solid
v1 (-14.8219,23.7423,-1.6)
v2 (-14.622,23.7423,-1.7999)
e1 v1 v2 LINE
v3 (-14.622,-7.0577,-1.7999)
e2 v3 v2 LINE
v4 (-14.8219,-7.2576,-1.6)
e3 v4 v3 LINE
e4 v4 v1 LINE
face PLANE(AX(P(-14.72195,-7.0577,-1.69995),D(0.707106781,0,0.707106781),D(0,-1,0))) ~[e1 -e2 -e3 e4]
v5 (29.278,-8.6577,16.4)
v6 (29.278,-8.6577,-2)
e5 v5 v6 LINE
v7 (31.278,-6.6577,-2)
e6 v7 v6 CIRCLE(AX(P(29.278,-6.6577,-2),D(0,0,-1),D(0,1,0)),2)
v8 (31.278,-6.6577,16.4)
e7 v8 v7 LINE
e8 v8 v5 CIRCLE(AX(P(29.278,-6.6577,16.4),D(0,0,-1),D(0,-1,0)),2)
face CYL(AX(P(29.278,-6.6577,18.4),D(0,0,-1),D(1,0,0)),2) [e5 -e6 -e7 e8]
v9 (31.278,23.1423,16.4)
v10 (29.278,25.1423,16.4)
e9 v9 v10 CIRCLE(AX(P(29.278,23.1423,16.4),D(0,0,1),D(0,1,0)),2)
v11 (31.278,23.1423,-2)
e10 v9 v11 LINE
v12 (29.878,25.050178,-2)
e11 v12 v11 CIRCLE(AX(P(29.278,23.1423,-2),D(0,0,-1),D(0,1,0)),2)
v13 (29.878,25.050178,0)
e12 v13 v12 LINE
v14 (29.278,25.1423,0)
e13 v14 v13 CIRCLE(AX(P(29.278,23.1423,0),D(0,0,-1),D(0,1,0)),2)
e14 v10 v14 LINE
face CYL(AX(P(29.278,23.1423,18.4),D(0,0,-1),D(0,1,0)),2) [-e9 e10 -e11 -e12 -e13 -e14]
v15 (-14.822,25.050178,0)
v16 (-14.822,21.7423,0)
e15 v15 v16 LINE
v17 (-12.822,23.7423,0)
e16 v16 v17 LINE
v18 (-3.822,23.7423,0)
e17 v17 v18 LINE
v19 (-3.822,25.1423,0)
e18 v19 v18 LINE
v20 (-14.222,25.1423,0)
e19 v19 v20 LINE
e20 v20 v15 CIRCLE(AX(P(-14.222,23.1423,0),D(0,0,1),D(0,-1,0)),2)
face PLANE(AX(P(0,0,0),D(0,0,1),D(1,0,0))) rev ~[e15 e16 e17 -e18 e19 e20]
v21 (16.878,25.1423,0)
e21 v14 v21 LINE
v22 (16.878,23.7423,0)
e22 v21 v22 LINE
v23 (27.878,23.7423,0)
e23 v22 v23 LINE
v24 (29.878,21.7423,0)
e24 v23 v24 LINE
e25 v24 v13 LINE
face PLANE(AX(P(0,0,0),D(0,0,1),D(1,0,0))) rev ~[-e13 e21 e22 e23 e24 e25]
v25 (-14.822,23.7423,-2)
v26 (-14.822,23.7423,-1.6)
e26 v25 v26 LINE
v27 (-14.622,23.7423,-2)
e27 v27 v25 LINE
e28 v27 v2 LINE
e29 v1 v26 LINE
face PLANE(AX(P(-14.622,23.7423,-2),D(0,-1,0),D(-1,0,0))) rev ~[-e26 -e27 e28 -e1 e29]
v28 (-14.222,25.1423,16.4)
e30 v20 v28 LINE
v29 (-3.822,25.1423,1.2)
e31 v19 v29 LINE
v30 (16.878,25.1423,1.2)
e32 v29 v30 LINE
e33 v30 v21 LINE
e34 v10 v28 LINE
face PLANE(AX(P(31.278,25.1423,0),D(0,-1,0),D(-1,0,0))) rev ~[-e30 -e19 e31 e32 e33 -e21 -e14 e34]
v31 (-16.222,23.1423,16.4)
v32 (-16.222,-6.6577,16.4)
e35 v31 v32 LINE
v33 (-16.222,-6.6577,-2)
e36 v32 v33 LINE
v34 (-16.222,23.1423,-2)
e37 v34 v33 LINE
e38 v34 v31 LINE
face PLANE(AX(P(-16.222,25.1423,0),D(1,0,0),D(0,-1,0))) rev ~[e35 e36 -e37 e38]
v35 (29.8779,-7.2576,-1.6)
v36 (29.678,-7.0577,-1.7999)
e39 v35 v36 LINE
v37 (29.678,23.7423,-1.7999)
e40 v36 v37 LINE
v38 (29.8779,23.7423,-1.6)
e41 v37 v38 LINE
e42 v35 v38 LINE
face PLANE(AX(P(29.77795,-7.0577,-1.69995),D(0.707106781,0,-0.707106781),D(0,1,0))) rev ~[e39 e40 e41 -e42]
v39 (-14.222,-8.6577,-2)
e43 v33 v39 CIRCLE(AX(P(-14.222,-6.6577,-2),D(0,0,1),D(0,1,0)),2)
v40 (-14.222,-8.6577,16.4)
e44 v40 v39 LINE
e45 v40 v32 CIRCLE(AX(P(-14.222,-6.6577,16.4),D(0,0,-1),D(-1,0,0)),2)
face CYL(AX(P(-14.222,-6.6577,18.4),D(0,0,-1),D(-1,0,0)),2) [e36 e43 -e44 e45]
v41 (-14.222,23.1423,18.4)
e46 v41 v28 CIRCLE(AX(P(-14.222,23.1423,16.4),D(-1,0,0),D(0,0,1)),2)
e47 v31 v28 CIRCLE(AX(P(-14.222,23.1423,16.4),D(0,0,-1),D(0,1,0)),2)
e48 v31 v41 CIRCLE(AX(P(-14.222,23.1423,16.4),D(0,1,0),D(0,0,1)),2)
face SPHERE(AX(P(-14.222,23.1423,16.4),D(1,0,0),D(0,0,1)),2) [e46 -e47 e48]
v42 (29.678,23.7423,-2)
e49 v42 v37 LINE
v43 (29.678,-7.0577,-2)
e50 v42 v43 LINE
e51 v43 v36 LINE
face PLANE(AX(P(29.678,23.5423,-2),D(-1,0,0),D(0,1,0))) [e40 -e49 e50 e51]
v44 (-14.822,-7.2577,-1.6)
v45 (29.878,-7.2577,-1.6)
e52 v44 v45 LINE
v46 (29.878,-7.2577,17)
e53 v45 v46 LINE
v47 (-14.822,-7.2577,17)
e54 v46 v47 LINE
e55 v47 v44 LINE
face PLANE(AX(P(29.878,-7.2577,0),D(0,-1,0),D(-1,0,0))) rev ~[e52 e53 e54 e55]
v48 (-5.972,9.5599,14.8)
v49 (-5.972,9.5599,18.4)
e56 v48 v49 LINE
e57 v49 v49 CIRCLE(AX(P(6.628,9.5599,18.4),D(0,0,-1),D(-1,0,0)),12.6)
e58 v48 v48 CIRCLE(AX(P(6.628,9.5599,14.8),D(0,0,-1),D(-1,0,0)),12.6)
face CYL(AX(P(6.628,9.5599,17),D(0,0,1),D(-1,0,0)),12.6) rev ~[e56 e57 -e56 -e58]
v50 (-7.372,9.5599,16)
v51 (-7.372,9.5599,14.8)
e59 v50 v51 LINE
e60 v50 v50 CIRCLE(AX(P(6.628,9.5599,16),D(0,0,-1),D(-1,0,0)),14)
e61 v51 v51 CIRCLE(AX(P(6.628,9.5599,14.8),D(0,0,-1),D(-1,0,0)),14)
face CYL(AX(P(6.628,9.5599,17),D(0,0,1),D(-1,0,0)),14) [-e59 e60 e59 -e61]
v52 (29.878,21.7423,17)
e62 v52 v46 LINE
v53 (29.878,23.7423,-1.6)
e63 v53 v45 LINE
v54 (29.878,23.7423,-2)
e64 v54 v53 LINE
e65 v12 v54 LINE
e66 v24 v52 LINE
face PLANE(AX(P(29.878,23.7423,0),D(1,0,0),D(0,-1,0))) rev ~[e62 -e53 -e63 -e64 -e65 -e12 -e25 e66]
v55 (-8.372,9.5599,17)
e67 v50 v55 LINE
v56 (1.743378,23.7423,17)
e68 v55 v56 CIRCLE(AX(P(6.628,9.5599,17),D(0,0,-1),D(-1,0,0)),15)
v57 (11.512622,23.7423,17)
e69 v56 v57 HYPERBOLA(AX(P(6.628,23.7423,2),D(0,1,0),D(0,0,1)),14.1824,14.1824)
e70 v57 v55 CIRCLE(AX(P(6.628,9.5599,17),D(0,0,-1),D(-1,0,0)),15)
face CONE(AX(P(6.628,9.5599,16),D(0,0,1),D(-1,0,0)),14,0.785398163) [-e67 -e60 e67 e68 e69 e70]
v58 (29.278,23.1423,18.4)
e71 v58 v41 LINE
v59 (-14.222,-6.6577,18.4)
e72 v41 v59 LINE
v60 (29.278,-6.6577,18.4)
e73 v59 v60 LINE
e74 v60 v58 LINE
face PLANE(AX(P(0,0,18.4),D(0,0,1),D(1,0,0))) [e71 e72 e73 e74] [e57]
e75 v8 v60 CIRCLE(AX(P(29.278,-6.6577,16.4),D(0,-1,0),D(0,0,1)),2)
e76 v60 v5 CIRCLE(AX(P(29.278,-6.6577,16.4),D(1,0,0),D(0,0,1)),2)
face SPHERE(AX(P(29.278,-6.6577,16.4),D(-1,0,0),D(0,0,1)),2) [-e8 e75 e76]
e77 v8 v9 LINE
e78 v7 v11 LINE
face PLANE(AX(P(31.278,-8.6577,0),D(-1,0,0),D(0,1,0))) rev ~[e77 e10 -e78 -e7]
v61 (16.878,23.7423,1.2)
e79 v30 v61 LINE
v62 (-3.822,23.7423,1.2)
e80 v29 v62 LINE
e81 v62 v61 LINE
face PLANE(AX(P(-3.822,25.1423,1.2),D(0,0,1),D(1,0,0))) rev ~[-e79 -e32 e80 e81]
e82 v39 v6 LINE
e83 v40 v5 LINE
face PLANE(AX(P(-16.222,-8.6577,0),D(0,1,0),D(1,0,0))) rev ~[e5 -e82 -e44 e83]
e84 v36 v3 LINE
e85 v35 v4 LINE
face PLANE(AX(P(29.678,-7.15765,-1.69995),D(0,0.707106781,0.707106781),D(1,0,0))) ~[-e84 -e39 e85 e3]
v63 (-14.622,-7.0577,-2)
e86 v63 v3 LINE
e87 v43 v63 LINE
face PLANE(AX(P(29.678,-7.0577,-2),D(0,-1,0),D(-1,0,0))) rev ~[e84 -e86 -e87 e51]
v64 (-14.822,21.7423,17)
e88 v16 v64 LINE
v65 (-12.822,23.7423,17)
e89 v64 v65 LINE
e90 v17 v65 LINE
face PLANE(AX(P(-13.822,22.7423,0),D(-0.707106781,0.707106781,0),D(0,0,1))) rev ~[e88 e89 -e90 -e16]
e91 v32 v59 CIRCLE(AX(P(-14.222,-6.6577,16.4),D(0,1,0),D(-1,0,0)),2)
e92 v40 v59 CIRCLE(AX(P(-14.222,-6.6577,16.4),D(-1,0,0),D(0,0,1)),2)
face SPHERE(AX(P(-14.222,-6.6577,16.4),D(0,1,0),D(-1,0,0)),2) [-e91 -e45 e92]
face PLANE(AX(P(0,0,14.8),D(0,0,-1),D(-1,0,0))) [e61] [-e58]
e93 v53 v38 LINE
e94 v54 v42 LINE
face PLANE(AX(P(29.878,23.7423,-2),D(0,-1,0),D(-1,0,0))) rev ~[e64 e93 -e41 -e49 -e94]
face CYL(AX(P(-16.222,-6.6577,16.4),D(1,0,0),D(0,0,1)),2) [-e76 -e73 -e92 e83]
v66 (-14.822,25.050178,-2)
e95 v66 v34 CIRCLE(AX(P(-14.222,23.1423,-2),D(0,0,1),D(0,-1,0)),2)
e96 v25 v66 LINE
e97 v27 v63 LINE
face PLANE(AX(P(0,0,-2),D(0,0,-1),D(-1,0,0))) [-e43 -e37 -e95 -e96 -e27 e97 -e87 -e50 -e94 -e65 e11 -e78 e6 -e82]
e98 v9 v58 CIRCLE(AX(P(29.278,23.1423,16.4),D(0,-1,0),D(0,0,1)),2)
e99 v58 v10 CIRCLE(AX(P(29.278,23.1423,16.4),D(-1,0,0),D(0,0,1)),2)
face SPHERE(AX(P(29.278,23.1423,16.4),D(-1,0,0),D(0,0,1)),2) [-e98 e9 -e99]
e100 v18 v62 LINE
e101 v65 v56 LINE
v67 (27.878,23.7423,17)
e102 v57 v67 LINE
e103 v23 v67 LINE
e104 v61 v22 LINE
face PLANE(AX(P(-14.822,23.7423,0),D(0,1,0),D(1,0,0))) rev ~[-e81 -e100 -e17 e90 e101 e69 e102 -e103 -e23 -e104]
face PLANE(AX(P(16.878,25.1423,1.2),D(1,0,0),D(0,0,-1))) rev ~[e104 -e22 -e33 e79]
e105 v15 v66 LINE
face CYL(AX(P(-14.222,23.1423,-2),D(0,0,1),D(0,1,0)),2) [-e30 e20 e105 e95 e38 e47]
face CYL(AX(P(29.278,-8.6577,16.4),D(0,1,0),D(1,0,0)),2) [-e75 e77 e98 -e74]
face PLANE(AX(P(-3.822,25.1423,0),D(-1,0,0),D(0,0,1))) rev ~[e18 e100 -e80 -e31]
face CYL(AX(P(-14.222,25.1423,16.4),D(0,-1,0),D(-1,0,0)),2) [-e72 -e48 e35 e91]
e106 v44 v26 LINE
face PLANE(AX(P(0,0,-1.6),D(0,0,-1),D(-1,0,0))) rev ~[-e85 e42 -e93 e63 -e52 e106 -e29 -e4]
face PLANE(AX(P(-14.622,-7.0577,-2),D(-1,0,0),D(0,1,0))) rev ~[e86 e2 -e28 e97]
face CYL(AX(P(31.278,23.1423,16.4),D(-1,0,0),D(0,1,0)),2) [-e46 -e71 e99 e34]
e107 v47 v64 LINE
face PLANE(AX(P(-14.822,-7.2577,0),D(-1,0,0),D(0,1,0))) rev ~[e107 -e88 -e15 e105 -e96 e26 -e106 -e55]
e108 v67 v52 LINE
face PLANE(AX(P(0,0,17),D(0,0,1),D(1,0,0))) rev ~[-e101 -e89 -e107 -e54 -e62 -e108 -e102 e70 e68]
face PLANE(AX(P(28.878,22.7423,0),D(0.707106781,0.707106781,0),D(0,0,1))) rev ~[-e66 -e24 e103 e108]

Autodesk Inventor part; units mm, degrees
ref_plane "YZ Plane" through (0, 0, 0) normal (1, 0, 0) x (0, 1, 0)
ref_plane "XZ Plane" through (0, 0, 0) normal (0, 1, 0) x (-1, 0, 0)
ref_plane "XY Plane" through (0, 0, 0) normal (0, 0, 1) x (1, 0, 0)
sketch "Sketch1" plane through (0, 0, 0) normal (0, 0, 1) x (1, 0, 0)
  line L0 (-14.822, 23.7423) -> (29.878, 23.7423)
  line L1 (29.878, 23.7423) -> (29.878, -7.2577)
  line L2 (29.878, -7.2577) -> (-14.822, -7.2577)
  line L3 (-14.822, -7.2577) -> (-14.822, 23.7423)
  line L4 (31.278, 25.1423) -> (-16.222, 25.1423)
  line L5 (-16.222, 25.1423) -> (-16.222, -8.6577)
  line L6 (-16.222, -8.6577) -> (31.278, -8.6577)
  line L7 (31.278, -8.6577) -> (31.278, 25.1423)
  point P0 (0, 0)
  dimension "d0" = 44.7
  dimension "d1" = 31
  dimension "d2" = 1.4
extrude "Extrusion1" add sketch "Sketch1" along normal blind 17
sketch "Sketch2" plane through (0, 0, 17) normal (0, 0, 1) x (1, 0, 0)
  line L0 (31.278, 25.1423) -> (-16.222, 25.1423) projected
  line L1 (-16.222, 25.1423) -> (-16.222, -8.6577) projected
  line L2 (-16.222, -8.6577) -> (31.278, -8.6577) projected
  line L3 (31.278, -8.6577) -> (31.278, 25.1423) projected
  point P0 (0, 0)
extrude "Extrusion2" add sketch "Sketch2" along normal blind 1.4
sketch "Sketch4" plane through (0, 0, 17) normal (0, 0, -1) x (-1, 0, 0)
  circle A0 centre (-6.628, 9.5599) radius 12.6
  line L0 (-29.878, -7.2577) -> (-29.878, 23.7423) projected
  line L1 (14.822, 23.7423) -> (14.822, -7.2577) projected
  point P0 (0, 0)
  dimension "d7" = 23.25
  dimension "d8" = 44.7
  dimension "d9" = 25.2
extrude "Extrusion3" cut sketch "Sketch4" against normal blind 1.4
sketch "Sketch5" plane through (0, 0, 17) normal (0, 0, -1) x (-1, 0, 0)
  circle A0 centre (-6.628, 9.5599) radius 12.6 projected
  circle A1 centre (-6.628, 9.5599) radius 14
  point P0 (0, 0)
  dimension "d12" = 1.4
extrude "Extrusion4" add sketch "Sketch5" along normal blind 2.2
chamfer "Chamfer1" distance 1 angle 45 1 edges at (20.628, 9.5599, 17)
sketch "Sketch6" plane through (0, 0, 0) normal (0, 0, -1) x (-1, 0, 0)
  line L0 (16.222, 25.1423) -> (16.222, -8.6577) projected
  line L1 (16.222, -8.6577) -> (-31.278, -8.6577) projected
  line L2 (-31.278, -8.6577) -> (-31.278, 25.1423) projected
  line L3 (14.822, 23.7423) -> (14.822, -7.2577) projected
  line L4 (14.822, -7.2577) -> (-29.878, -7.2577) projected
  line L5 (-29.878, -7.2577) -> (-29.878, 23.7423) projected
  line L6 (14.822, 23.7423) -> (-1.7434, 23.7423) projected
  line L7 (14.822, 23.7423) -> (14.822, 25.1423)
  line L8 (14.822, 25.1423) -> (16.222, 25.1423)
  line L9 (-29.878, 23.7423) -> (-29.878, 25.1423)
  line L10 (-29.878, 25.1423) -> (-31.278, 25.1423)
  point P0 (0, 0)
extrude "Extrusion5" add sketch "Sketch6" along normal blind 2
sketch "Sketch8" plane through (0, 0, -2) normal (0, 0, -1) x (-1, 0, 0)
  line L0 (14.822, -7.2577) -> (14.822, 23.7423) projected
  line L1 (-29.878, 23.7423) -> (-29.878, -7.2577) projected
  line L2 (14.822, -7.2577) -> (-29.878, -7.2577)
  line L3 (-29.878, -7.2577) -> (-29.878, 23.7423)
  line L4 (14.822, 23.7423) -> (14.822, -7.2577)
  line L5 (-29.678, -7.0577) -> (14.622, -7.0577)
  line L6 (14.622, -7.0577) -> (14.622, 23.5423)
  line L7 (-29.678, 23.5423) -> (-29.678, -7.0577)
  line L8 (14.622, 23.5423) -> (14.622, 23.7423)
  line L9 (-29.678, 23.5423) -> (-29.678, 23.7423)
  line L10 (-29.878, 23.7423) -> (14.822, 23.7423) projected
  line L11 (-29.878, 23.7423) -> (-29.678, 23.7423)
  line L12 (14.622, 23.7423) -> (14.822, 23.7423)
  point P0 (0, 0)
  dimension "d24" = 0.2
extrude "Extrusion7" add sketch "Sketch8" against normal blind 0.4 contours L2 L1 L10 L9 L7 L5 L6 L8 L0
chamfer "Chamfer2" distance 0.2 angle 45 3 edges at (7.528, -7.0577, -1.6) (-14.622, 8.3423, -1.6) (29.678, 8.3423, -1.6)
chamfer "Chamfer3" distance 2 angle 45 1 edges at (-14.822, 23.7423, 8.5)
chamfer "Chamfer4" distance 2 angle 45 1 edges at (29.878, 23.7423, 8.5)
sketch "Sketch9" plane through (-14.822, 25.1423, 0) normal (0, 1, 0) x (1, 0, 0)
  line L0 (42.7, 0) -> (2, 0) projected
  line L1 (31.7, 0) -> (11, 0)
  line L2 (11, 0) -> (11, -1.2)
  line L3 (11, -1.2) -> (31.7, -1.2)
  line L4 (31.7, -1.2) -> (31.7, 0)
  line L5 (44.7, 0) -> (44.7, -17) projected
  line L6 (0, -17) -> (0, 0) projected
  point P0 (14.822, 0)
  dimension "d48" = 13
  dimension "d49" = 11
  dimension "d50" = 1.2
extrude "Extrusion8" cut sketch "Sketch9" against normal up to surface (1.4 mm away)
fillet "Fillet3" radius 2 8 edges at (7.528, 25.1423, 18.4) (-16.222, 8.2423, 18.4) (-16.222, 25.1423, 8.2) (-16.222, -8.6577, 8.2) (7.528, -8.6577, 18.4) (31.278, 8.2423, 18.4) (31.278, -8.6577, 8.2) (31.278, 25.1423, 8.2)
properties part number "lupa-card-c-mount"
